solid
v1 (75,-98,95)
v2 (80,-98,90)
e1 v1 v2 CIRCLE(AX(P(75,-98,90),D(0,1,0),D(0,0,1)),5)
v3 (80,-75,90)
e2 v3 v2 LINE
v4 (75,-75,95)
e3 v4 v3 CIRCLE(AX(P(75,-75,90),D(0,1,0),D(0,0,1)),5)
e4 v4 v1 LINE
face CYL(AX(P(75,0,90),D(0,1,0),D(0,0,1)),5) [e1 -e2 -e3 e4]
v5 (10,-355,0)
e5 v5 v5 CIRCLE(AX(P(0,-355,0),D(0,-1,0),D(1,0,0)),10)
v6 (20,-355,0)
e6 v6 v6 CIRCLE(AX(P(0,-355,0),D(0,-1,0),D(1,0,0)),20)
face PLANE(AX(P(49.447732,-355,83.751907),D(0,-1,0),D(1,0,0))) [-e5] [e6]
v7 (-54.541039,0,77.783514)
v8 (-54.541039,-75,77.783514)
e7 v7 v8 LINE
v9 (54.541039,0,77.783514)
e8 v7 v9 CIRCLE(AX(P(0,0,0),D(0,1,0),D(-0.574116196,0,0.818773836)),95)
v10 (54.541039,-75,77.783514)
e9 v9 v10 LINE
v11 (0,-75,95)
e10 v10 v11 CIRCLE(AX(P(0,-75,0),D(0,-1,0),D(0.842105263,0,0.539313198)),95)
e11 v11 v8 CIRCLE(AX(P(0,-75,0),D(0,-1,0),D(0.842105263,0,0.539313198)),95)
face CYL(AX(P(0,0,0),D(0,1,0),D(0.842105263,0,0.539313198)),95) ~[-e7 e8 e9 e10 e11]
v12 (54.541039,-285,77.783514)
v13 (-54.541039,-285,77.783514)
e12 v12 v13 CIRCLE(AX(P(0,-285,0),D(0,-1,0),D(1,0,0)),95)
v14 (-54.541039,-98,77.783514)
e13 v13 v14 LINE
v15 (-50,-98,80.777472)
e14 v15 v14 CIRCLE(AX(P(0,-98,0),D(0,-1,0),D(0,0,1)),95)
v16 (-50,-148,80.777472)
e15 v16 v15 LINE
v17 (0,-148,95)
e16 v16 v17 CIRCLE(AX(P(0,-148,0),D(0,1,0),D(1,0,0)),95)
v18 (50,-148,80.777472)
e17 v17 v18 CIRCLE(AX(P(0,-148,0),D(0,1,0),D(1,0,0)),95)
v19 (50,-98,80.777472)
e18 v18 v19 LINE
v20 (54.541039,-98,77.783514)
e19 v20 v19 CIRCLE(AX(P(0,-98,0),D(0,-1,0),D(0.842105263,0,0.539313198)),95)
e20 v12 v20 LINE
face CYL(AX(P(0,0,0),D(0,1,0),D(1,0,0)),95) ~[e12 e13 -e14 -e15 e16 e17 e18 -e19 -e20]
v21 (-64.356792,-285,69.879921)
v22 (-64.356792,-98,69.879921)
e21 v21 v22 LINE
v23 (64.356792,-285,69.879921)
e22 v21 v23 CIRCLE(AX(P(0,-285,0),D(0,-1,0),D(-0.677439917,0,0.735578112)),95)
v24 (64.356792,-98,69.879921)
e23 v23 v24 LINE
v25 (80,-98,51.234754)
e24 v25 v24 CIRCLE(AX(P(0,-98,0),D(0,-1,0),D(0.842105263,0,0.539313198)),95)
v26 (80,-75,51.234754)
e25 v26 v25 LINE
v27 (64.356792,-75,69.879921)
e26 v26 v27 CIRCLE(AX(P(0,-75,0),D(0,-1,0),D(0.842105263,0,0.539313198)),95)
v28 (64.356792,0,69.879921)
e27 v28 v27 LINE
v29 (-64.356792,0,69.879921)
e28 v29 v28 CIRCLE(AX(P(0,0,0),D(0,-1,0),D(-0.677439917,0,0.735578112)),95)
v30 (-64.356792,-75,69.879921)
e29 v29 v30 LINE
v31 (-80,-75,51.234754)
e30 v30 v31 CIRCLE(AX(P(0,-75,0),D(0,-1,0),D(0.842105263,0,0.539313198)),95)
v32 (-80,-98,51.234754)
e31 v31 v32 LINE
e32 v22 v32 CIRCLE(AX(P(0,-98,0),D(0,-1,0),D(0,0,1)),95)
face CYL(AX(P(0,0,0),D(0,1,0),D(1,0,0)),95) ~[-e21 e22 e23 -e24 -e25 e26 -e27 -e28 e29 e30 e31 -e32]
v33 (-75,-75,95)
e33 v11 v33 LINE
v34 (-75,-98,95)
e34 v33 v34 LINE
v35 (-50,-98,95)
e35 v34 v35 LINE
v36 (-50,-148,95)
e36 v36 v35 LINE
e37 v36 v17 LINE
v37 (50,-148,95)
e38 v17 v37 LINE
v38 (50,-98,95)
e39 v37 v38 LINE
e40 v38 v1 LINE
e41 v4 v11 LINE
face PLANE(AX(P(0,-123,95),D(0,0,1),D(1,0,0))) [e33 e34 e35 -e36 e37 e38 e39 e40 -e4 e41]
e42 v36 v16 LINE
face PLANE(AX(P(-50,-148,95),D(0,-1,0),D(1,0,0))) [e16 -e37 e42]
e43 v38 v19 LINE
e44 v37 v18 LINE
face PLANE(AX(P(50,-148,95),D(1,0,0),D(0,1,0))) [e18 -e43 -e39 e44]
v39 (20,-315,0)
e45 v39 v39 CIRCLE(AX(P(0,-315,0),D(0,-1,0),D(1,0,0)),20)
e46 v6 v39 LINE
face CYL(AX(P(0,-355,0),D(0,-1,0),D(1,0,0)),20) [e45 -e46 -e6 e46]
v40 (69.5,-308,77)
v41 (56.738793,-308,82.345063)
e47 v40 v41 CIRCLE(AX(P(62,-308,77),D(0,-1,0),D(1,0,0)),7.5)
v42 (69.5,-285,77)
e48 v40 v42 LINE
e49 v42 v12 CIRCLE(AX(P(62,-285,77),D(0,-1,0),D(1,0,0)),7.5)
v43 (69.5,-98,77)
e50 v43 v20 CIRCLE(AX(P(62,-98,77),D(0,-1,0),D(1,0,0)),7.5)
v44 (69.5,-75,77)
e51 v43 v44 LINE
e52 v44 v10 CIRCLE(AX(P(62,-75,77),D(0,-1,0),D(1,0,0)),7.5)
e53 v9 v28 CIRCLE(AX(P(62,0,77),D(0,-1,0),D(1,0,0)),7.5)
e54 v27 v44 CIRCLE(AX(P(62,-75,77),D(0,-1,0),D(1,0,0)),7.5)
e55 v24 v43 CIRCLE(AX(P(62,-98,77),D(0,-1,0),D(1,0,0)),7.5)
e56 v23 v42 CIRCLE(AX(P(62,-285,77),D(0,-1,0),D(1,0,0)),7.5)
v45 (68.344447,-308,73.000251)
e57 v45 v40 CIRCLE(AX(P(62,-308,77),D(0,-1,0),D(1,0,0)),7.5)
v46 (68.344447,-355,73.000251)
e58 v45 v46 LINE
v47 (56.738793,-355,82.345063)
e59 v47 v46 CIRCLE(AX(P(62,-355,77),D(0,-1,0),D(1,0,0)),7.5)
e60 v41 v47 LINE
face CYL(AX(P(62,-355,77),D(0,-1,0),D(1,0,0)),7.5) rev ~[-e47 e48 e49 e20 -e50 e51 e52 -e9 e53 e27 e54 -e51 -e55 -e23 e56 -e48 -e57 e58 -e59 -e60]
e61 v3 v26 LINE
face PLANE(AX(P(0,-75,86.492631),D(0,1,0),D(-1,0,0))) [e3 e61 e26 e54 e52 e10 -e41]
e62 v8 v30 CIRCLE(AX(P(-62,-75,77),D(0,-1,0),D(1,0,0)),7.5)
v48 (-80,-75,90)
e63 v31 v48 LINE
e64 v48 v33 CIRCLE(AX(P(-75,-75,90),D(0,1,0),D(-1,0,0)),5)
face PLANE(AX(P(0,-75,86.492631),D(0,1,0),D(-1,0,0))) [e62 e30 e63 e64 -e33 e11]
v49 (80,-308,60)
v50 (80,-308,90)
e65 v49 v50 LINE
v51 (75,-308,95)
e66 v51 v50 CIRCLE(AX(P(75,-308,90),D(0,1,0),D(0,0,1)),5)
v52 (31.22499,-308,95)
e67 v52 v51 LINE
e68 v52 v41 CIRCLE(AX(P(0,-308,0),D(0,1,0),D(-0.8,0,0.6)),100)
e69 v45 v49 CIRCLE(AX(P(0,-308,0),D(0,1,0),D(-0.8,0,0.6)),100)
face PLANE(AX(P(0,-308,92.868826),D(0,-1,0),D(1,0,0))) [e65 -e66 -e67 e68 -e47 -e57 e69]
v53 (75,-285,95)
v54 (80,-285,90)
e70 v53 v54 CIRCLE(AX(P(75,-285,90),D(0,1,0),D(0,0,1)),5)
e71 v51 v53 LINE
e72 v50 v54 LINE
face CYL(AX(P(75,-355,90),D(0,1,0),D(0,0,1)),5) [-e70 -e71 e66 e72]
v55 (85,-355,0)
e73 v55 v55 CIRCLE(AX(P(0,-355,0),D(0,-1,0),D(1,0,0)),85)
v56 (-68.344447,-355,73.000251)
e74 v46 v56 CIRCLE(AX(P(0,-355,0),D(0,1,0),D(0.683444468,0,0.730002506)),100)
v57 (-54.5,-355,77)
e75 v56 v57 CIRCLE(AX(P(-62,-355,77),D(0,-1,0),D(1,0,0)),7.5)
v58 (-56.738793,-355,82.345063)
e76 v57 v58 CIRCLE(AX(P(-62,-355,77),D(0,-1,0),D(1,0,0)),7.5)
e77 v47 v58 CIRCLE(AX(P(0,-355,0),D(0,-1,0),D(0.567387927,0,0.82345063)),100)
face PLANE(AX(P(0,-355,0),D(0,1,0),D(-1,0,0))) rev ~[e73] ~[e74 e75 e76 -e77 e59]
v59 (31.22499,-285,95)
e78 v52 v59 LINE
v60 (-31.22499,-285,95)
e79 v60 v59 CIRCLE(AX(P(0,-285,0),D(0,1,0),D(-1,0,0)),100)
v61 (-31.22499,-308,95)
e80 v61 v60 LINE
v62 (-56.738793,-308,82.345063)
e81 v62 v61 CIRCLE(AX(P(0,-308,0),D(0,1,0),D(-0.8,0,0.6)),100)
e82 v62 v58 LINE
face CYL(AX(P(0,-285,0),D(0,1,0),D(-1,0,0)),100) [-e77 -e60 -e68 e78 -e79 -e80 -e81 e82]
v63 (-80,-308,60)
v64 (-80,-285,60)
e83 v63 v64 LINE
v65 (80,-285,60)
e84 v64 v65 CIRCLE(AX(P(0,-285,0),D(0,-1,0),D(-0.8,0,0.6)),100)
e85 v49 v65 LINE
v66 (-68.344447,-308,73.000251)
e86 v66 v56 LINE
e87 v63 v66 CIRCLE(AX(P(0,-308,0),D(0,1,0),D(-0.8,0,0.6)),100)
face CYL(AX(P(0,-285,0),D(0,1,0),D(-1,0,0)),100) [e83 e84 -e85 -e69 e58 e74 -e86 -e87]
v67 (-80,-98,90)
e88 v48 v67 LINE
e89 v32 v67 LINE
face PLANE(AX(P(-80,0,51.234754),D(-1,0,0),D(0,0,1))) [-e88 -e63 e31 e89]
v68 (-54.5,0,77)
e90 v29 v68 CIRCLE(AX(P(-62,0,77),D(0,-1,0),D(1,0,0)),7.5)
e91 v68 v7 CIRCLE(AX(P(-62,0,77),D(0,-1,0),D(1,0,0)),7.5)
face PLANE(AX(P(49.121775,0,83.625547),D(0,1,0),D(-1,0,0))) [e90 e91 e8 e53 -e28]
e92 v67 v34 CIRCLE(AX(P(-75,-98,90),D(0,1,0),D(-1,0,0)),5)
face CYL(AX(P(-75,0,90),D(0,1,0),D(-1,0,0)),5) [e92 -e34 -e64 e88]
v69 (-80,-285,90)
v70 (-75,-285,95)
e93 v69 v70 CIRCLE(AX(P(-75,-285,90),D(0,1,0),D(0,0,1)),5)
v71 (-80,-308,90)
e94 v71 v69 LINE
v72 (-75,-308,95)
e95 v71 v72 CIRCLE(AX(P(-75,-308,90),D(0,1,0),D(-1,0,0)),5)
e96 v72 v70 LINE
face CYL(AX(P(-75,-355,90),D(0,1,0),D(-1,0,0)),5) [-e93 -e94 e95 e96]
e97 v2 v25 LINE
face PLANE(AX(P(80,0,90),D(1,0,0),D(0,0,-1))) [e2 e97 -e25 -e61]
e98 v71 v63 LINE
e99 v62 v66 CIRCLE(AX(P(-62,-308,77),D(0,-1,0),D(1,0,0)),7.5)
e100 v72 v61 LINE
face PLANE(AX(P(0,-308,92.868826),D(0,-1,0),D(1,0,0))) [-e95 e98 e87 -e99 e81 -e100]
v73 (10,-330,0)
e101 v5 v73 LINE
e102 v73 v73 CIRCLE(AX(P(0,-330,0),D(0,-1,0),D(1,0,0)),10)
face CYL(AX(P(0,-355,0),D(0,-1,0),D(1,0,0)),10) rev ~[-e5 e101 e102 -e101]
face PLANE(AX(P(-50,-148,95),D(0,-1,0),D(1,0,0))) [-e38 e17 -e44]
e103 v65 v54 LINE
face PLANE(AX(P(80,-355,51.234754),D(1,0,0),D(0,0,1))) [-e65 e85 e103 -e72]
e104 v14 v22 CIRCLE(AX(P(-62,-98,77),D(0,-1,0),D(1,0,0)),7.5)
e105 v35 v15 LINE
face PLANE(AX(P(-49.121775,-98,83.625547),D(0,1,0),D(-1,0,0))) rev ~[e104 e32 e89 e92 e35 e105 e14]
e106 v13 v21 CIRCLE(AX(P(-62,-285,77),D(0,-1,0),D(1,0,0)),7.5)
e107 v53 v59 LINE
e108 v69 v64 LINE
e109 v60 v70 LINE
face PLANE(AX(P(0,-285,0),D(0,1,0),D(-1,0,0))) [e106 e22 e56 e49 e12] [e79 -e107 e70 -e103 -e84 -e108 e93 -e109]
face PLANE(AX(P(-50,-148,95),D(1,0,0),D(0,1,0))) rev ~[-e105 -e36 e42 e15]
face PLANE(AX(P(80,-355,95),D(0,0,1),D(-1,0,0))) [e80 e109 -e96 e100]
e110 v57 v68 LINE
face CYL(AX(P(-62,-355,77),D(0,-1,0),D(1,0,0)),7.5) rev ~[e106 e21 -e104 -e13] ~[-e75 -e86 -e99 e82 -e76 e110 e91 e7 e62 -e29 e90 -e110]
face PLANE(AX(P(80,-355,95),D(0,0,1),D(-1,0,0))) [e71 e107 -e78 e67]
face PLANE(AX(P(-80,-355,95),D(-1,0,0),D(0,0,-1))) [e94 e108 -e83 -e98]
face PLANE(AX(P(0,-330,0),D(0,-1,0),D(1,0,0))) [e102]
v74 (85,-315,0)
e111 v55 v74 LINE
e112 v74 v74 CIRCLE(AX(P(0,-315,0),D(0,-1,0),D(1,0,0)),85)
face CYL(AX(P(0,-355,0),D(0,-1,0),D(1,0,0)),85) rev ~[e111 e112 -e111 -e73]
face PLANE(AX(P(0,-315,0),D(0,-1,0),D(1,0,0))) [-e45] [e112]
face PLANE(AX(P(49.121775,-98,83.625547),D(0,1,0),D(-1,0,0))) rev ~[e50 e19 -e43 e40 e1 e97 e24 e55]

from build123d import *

# Parameters (mm, degrees)
F0_R      = 95
F1_DEPTH  = 355
F3_DEPTH  = 70
F4_R      = 85
F4_R_2    = 20
F5_DEPTH  = 40
F6_R      = 10
F7_DEPTH  = 25
F10_DEPTH = 98
F11_R     = 100
F11_R_2   = 95
F12_DEPTH = 70
F8_R      = 7.5
F13_DEPTH = 500
F14_R     = 5
F16_DEPTH = 47
F18_DEPTH = 75
F19_W     = 100
F19_H     = 50
F20_DEPTH = 22


# Not quite as in the source:
# - a feature names something its author has since deleted; it is built from what else it names


with BuildPart() as f1:
    # F0 (on Front) → F1 (new body)
    with BuildSketch(Plane.XZ):
        Circle(F0_R)
    extrude(amount=F1_DEPTH)

    # F2 (on face) → F3 (join)
    with BuildSketch(Plane.XZ.offset(355)):
        with BuildLine():
            Line((80, 51.2347538298), (80, 95))
            Line((80, 95), (46.4354390525, 95))
            Line((46.4354390525, 95), (0, 95))
            ThreePointArc((0, 95), (45.594398703, 83.3435708793), (80, 51.2347538298))
        make_face()
        with BuildLine():
            ThreePointArc((95, 0), (91.1729126441, 26.6926956301), (80, 51.2347538298))
            Line((80, 51.2347538298), (80, 50))
            Line((80, 50), (-80, 50))
            Line((-80, 50), (-80, 51.2347538298))
            ThreePointArc((-80, 51.2347538298), (-26.6926956301, -91.1729126441), (95, 0))
        make_face()
        with BuildLine():
            Line((80, 50), (80, 51.2347538298))
            ThreePointArc((80, 51.2347538298), (45.594398703, 83.3435708793), (0, 95))
            ThreePointArc((0, 95), (-45.594398703, 83.3435708793), (-80, 51.2347538298))
            Line((-80, 51.2347538298), (-80, 50))
            Line((-80, 50), (80, 50))
        make_face()
        with BuildLine():
            ThreePointArc((-80, 51.2347538298), (-45.594398703, 83.3435708793), (0, 95))
            Line((0, 95), (-46.4354390525, 95))
            Line((-46.4354390525, 95), (-80, 95))
            Line((-80, 95), (-80, 51.2347538298))
        make_face()
    extrude(amount=-F3_DEPTH)

    # F4 (on face) → F5 (cut)
    with BuildSketch(Plane.XZ.offset(355)):
        Circle(F4_R)
        Circle(F4_R_2, mode=Mode.SUBTRACT)
    extrude(amount=-F5_DEPTH, mode=Mode.SUBTRACT)

    # F6 (on face) → F7 (cut)
    with BuildSketch(Plane.XZ.offset(355)):
        Circle(F6_R)
    extrude(amount=-F7_DEPTH, mode=Mode.SUBTRACT)

    # F9 (on face) → F10 (join)
    with BuildSketch(Plane(origin=(0, 0, 0), x_dir=(-1, 0, 0), z_dir=(0, 1, 0))):
        with BuildLine():
            ThreePointArc((-80, 51.2347538298), (-45.594398703, 83.3435708793), (0, 95))
            Line((0, 95), (-75, 95))
            ThreePointArc((-75, 95), (-78.5355339059, 93.5355339059), (-80, 90))
            Line((-80, 90), (-80, 51.2347538298))
        make_face()
        with BuildLine():
            ThreePointArc((0, 95), (45.594398703, 83.3435708793), (80, 51.2347538298))
            Line((80, 51.2347538298), (80, 90))
            ThreePointArc((80, 90), (78.5355339059, 93.5355339059), (75, 95))
            Line((75, 95), (0, 95))
        make_face()
    extrude(amount=-F10_DEPTH)

    # F11 (on face) → F12 (join)
    with BuildSketch(Plane(origin=(0, -285, 0), x_dir=(-1, 0, 0), z_dir=(0, 1, 0))):
        Circle(F11_R)
        Circle(F11_R_2, mode=Mode.SUBTRACT)
    extrude(amount=-F12_DEPTH)

    # F8 (on face) → F13 (cut)
    with BuildSketch(Plane.XZ.offset(355)):
        with Locations((-62, 77)):
            Circle(F8_R)
        with Locations((62, 77)):
            Circle(F8_R)
    extrude(amount=-F13_DEPTH, mode=Mode.SUBTRACT)

    # F14
    f14_edges = [f1.edges().sort_by_distance(p)[0] for p in [
        (-80, -320, 95),
        (80, -320, 95),
    ]]
    fillet(f14_edges, radius=F14_R)

    # F15 (on face) → F16 (cut)
    with BuildSketch(Plane.XZ.offset(355)):
        with BuildLine():
            ThreePointArc((-80, 60), (0, 100), (80, 60))
            Line((80, 60), (80, 108.7283083646))
            Line((80, 108.7283083646), (-80, 108.7283083646))
            Line((-80, 108.7283083646), (-80, 60))
        make_face()
    extrude(amount=-F16_DEPTH, mode=Mode.SUBTRACT)

    # F17 (on face) → F18 (cut)
    with BuildSketch(Plane(origin=(0, 0, 0), x_dir=(-1, 0, 0), z_dir=(0, 1, 0))):
        with BuildLine():
            ThreePointArc((-80, 51.2347538298), (0, 95), (80, 51.2347538298))
            Line((80, 51.2347538298), (80, 103.6055907607))
            Line((80, 103.6055907607), (-80, 103.6055907607))
            Line((-80, 103.6055907607), (-80, 51.2347538298))
        make_face()
    extrude(amount=-F18_DEPTH, mode=Mode.SUBTRACT)

    # F19 (on face) → F20 (join)
    with BuildSketch(Plane.XY.offset(95)):
        with Locations((0, -123)):
            Rectangle(F19_W, F19_H)
    extrude(amount=-F20_DEPTH)


solid = f1.part
